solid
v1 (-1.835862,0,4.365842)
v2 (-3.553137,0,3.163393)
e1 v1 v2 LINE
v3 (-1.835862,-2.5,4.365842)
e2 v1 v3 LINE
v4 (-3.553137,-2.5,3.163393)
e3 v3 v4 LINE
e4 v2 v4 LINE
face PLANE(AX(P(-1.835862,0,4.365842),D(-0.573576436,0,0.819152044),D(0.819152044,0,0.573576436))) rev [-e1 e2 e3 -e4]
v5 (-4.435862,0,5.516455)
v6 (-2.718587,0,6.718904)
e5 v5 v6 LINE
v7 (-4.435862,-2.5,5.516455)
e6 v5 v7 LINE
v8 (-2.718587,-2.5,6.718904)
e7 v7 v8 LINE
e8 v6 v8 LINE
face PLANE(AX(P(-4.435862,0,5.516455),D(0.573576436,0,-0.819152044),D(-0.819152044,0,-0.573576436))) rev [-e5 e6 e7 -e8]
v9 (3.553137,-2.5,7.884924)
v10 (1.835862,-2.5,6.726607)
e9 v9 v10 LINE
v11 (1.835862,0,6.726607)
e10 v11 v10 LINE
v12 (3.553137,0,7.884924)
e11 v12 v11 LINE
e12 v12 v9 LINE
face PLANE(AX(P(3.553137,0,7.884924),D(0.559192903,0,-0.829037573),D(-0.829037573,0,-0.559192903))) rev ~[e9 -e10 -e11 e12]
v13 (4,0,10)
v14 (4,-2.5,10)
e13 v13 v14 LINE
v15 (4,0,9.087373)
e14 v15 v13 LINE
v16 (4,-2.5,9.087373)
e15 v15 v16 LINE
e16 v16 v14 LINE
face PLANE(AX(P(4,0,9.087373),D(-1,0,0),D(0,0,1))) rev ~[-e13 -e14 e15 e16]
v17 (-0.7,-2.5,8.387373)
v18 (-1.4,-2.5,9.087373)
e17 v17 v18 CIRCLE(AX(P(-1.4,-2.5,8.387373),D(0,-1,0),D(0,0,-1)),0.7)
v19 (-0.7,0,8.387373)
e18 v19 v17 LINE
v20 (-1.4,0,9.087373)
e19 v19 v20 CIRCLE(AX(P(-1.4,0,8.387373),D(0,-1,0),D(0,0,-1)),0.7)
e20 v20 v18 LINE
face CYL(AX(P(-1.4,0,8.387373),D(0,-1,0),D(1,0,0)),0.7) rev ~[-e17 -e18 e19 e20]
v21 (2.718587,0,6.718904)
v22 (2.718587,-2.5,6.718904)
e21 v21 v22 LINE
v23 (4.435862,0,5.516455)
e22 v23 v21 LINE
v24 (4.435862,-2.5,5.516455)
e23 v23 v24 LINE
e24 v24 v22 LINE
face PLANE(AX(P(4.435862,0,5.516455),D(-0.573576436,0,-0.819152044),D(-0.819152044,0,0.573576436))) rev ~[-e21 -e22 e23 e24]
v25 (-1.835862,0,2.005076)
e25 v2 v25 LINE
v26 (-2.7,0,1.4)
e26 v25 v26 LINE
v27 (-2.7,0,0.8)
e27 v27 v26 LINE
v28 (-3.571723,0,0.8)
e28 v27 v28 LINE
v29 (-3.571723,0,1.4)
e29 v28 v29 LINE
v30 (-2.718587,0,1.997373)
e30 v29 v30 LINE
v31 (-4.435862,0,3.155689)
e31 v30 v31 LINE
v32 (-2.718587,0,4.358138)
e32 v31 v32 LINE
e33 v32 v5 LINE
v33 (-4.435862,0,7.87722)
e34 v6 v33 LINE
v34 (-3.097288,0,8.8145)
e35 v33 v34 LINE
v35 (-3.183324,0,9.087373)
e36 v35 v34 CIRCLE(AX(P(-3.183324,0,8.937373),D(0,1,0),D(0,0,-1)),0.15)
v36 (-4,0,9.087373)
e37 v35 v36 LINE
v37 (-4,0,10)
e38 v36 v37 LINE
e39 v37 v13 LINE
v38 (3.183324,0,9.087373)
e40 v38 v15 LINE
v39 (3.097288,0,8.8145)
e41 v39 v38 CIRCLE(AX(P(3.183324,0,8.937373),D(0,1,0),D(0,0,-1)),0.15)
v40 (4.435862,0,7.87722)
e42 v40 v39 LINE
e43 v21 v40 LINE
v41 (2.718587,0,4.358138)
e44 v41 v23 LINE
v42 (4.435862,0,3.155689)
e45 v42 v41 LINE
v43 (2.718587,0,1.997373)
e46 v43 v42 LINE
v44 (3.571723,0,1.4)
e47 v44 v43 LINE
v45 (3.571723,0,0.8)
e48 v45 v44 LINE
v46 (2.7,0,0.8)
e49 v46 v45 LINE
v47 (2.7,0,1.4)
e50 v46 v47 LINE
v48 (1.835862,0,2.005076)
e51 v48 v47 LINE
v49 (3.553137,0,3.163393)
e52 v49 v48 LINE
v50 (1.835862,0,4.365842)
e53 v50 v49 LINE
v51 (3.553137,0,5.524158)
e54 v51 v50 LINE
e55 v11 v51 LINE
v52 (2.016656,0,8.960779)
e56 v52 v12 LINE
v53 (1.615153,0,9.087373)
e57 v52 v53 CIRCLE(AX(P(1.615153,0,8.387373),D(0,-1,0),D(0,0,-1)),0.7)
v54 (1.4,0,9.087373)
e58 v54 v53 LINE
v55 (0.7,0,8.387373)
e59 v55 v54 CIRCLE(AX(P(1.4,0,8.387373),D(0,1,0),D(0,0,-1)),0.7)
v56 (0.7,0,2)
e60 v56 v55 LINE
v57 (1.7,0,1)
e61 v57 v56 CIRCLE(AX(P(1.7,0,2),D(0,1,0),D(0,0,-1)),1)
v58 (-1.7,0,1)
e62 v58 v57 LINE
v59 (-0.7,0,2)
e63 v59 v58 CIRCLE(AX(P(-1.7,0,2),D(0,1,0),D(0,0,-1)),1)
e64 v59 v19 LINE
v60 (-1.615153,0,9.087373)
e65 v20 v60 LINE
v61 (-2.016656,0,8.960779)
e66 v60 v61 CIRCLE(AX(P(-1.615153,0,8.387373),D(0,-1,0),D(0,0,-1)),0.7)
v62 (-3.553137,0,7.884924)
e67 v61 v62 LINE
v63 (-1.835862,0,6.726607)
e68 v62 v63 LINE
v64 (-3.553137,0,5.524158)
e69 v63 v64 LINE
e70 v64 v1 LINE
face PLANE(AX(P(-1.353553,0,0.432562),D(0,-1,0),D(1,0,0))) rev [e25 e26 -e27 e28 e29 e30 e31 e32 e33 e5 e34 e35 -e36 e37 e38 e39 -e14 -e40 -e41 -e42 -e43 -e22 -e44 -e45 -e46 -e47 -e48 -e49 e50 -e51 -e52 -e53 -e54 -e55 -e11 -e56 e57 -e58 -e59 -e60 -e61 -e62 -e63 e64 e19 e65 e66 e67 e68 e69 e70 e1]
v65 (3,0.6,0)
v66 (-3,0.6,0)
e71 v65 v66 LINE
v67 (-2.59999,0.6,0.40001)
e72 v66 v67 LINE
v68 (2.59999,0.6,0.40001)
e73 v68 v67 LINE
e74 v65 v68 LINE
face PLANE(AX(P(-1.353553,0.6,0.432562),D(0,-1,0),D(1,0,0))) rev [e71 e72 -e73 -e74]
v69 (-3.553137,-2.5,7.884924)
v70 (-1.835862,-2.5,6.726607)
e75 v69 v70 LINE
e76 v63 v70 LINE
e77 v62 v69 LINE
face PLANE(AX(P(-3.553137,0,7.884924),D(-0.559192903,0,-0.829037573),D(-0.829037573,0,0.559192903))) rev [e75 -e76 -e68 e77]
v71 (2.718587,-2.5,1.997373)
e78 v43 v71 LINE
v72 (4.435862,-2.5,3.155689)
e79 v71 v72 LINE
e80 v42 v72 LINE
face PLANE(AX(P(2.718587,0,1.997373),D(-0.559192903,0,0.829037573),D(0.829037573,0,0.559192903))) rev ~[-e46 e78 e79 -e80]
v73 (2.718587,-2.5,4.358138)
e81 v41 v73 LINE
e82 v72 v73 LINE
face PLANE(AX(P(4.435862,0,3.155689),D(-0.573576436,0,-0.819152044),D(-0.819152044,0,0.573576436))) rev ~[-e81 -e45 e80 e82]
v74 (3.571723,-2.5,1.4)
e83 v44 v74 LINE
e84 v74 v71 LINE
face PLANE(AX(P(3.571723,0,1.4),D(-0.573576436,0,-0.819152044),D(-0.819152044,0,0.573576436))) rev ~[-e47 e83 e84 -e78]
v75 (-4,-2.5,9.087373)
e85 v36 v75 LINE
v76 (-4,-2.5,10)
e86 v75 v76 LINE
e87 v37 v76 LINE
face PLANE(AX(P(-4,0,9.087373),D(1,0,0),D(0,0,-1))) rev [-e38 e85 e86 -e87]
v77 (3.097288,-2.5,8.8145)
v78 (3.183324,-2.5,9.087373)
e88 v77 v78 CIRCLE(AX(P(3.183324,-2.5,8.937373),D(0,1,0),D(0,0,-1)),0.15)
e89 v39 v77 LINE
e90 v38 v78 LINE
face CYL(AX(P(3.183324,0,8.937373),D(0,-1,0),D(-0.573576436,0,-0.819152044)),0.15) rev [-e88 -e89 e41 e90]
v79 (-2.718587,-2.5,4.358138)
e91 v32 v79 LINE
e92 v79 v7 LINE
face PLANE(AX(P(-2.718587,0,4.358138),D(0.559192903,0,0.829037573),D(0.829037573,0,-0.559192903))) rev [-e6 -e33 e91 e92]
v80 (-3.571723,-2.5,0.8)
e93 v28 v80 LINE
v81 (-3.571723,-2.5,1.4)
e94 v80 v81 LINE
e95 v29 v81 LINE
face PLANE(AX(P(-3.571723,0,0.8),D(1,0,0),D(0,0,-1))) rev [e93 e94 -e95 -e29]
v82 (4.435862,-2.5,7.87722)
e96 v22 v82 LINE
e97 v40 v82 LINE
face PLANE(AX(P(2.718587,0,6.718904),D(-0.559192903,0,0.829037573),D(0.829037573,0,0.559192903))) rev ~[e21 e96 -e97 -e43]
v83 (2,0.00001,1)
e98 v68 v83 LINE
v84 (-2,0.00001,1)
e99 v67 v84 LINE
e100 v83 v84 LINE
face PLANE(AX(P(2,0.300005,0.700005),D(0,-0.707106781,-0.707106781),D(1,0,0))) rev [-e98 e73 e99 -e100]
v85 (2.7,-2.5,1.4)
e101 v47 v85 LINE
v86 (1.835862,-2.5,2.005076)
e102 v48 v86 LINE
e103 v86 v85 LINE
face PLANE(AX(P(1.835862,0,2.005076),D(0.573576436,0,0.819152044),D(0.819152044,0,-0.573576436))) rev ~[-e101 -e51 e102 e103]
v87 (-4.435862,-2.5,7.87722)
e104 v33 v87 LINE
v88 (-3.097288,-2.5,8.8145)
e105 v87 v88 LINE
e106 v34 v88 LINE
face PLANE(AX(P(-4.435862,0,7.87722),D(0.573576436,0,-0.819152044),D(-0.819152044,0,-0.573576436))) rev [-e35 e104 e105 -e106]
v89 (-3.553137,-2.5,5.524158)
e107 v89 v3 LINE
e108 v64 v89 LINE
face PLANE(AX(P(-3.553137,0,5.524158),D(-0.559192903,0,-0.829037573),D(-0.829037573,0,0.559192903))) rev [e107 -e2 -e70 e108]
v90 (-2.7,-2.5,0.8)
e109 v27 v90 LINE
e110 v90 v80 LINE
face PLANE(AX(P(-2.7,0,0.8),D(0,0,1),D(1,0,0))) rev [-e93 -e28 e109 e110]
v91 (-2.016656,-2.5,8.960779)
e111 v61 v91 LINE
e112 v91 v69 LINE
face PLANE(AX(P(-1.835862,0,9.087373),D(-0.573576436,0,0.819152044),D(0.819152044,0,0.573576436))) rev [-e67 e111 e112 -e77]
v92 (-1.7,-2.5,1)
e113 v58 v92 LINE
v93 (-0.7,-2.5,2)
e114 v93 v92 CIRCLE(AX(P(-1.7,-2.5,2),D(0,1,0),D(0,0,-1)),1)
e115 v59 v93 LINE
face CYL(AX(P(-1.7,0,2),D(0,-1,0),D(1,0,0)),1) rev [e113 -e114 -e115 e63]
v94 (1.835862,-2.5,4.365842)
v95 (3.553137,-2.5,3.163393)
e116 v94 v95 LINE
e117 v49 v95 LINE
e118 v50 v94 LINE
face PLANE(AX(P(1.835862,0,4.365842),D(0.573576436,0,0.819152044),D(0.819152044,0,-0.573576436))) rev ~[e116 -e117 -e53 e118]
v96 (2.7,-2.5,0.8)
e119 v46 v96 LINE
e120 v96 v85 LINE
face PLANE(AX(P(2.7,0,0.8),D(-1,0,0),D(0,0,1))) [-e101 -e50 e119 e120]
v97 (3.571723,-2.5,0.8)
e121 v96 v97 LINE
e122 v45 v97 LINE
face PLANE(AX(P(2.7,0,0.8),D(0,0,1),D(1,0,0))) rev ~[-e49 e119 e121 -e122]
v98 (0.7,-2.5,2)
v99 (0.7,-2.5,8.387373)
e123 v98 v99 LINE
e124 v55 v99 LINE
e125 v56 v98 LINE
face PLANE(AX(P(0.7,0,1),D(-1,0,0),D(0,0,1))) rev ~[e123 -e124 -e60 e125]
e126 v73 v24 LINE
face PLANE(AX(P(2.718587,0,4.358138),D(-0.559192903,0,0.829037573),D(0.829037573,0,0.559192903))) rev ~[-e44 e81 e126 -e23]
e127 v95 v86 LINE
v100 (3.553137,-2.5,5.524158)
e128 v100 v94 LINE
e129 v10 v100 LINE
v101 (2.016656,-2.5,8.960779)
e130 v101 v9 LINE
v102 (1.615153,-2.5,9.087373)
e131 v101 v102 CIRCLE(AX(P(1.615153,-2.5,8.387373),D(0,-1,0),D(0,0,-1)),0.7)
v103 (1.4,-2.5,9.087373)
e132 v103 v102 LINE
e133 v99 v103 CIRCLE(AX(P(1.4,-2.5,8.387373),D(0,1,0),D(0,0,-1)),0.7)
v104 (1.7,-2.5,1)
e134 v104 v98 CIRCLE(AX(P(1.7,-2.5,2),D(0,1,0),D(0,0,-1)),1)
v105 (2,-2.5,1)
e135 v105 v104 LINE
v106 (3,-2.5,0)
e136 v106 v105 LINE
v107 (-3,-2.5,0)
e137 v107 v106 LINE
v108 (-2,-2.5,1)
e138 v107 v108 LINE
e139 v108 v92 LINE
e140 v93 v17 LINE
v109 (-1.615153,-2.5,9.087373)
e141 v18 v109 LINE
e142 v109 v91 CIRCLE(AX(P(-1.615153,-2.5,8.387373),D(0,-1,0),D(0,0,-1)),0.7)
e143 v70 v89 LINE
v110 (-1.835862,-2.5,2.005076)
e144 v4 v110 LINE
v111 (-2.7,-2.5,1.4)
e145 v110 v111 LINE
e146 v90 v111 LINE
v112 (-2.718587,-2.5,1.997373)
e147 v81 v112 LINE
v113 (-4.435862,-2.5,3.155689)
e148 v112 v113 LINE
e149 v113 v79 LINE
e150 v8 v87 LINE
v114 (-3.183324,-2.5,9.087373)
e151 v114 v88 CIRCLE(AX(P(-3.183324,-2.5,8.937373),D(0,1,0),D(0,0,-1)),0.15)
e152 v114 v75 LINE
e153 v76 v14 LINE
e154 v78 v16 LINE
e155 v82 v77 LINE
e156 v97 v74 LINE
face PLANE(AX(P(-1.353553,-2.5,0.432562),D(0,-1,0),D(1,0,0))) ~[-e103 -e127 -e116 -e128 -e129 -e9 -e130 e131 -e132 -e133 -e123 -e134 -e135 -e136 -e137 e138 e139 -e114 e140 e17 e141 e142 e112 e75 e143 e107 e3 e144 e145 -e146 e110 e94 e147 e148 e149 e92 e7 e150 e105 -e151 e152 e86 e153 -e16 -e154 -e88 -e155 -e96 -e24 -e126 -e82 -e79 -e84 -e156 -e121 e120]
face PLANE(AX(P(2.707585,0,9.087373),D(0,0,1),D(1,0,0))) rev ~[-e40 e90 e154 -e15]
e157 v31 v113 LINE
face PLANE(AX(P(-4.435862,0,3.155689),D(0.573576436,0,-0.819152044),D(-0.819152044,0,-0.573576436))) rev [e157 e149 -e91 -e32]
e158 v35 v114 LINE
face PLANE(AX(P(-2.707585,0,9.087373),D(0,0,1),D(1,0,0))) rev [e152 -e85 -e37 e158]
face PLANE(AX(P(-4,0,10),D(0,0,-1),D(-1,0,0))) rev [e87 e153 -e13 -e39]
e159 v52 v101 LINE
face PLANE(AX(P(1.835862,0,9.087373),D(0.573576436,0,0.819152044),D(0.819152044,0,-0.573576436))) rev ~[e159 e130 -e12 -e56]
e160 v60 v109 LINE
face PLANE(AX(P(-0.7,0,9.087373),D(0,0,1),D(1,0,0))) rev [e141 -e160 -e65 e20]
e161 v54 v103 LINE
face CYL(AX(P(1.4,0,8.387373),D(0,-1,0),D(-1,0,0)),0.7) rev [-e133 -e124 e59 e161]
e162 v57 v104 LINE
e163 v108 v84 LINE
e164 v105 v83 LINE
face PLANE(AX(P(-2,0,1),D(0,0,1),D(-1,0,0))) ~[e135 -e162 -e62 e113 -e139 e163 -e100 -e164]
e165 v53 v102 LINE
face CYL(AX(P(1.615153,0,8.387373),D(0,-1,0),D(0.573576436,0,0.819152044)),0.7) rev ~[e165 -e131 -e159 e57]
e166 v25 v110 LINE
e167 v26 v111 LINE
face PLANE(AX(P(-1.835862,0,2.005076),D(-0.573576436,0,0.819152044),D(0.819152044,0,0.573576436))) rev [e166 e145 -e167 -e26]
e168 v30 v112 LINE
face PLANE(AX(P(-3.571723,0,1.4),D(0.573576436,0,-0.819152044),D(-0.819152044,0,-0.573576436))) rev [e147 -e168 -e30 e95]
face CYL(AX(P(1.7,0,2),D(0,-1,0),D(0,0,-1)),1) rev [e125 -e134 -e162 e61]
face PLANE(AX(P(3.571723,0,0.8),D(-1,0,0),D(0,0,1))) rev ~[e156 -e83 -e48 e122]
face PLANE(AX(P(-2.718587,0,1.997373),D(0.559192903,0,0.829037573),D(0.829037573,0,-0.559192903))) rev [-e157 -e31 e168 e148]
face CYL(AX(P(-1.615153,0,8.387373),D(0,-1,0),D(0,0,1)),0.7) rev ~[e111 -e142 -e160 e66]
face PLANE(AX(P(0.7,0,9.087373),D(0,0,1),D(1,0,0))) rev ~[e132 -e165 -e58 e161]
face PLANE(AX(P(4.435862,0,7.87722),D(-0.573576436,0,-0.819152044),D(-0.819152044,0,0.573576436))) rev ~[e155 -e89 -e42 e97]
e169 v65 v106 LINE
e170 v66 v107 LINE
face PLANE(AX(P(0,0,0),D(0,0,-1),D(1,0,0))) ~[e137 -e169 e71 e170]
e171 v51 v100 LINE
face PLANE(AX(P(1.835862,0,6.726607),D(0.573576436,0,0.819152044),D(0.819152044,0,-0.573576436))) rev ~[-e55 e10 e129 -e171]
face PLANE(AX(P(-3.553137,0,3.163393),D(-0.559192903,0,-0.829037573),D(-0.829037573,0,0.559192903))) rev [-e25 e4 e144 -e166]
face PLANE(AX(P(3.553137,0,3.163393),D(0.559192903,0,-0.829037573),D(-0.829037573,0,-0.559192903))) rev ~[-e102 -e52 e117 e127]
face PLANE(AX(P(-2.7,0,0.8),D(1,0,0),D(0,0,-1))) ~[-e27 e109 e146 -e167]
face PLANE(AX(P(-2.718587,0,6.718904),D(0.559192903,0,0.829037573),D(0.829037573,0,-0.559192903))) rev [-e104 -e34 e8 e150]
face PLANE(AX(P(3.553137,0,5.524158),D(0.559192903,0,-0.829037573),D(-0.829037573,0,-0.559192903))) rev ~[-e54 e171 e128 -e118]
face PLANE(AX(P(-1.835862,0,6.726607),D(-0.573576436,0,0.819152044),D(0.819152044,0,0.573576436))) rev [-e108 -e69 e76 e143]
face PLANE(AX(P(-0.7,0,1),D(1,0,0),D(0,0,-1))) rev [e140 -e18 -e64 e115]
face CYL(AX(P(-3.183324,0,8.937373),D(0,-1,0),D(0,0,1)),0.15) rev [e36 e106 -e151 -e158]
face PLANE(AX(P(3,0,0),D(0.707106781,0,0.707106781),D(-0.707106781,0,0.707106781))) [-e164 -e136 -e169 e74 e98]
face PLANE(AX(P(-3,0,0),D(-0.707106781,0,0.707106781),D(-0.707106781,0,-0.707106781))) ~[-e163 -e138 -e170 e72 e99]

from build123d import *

# Parameters (mm, degrees)
F0_W     = 0.8717233978
F0_H     = 0.6
F1_DEPTH = 2.5
F2_DEPTH = 0.6
F4_SIZE  = 0.59999
F5_R     = 0.7
F6_R     = 1
F7_R     = 0.15


# Not quite as in the source:
# - a fillet or chamfer is up to 0.001 mm smaller than in the source, because OpenCascade refuses the exact size


with BuildPart() as f1:
    # F0 (on Front) → F1 (new body)
    with BuildSketch(Plane.XZ):
        Polygon((0, 1), (0, 0), (3, 0), (2, 1), (0.7, 1), align=None)
        Polygon((2.7075850967, 9.087372576), (1.8358616989, 9.087372576), (3.5531366706, 7.8849236956), (1.8358616989, 6.7266071015), (3.5531366706, 5.5241582211), (1.8358616989, 4.365841627), (3.5531366706, 3.1633927466), (1.8358616989, 2.0050761525), (2.7, 1.4), (3.5717233978, 1.4), (2.7185867272, 1.9973727279), (4.4358616989, 3.155689322), (2.7185867272, 4.3581382024), (4.4358616989, 5.5164547965), (2.7185867272, 6.7189036769), (4.4358616989, 7.877220271), align=None)
        with Locations((3.1358616989, 1.1)):
            Rectangle(F0_W, F0_H)
        Polygon((0, 9), (0, 1), (0.7, 1), (0.7, 9.087372576), (1.8358616989, 9.087372576), (2.7075850967, 9.087372576), (4, 9.087372576), (4, 10), (0, 10), align=None)
    extrude(amount=F1_DEPTH)

    # F0 (on Front) → F2 (join)
    with BuildSketch(Plane.XZ):
        Polygon((0, 1), (0, 0), (3, 0), (2, 1), (0.7, 1), align=None)
    extrude(amount=-F2_DEPTH)

    # F3: F1 across face


with BuildPart() as f1_1:
    add(f1.part)
    add(f1.part.mirror(Plane(origin=(0, -1.213671875, 4.89453125), x_dir=(0, -1, 0), z_dir=(-1, 0, 0))))

    # F4 (size 0.6 in the source; OpenCascade refuses exactly that, so slightly less here)
    f4_edges = [f1_1.edges().sort_by_distance(p)[0] for p in [
        (0, 0.6, 1),
    ]]
    chamfer(f4_edges, length=F4_SIZE)

    # F5
    f5_edges = [f1_1.edges().sort_by_distance(p)[0] for p in [
        (0.7, -1.25, 9.087373),
        (-0.7, -1.25, 9.087373),
        (1.835862, -1.25, 9.087373),
        (-1.835862, -1.25, 9.087373),
    ]]
    fillet(f5_edges, radius=F5_R)

    # F6
    f6_edges = [f1_1.edges().sort_by_distance(p)[0] for p in [
        (0.7, -1.25, 1),
        (-0.7, -1.25, 1),
    ]]
    fillet(f6_edges, radius=F6_R)

    # F7
    f7_edges = [f1_1.edges().sort_by_distance(p)[0] for p in [
        (2.707585, -1.25, 9.087373),
        (-2.707585, -1.25, 9.087373),
    ]]
    fillet(f7_edges, radius=F7_R)


solid = f1_1.part
